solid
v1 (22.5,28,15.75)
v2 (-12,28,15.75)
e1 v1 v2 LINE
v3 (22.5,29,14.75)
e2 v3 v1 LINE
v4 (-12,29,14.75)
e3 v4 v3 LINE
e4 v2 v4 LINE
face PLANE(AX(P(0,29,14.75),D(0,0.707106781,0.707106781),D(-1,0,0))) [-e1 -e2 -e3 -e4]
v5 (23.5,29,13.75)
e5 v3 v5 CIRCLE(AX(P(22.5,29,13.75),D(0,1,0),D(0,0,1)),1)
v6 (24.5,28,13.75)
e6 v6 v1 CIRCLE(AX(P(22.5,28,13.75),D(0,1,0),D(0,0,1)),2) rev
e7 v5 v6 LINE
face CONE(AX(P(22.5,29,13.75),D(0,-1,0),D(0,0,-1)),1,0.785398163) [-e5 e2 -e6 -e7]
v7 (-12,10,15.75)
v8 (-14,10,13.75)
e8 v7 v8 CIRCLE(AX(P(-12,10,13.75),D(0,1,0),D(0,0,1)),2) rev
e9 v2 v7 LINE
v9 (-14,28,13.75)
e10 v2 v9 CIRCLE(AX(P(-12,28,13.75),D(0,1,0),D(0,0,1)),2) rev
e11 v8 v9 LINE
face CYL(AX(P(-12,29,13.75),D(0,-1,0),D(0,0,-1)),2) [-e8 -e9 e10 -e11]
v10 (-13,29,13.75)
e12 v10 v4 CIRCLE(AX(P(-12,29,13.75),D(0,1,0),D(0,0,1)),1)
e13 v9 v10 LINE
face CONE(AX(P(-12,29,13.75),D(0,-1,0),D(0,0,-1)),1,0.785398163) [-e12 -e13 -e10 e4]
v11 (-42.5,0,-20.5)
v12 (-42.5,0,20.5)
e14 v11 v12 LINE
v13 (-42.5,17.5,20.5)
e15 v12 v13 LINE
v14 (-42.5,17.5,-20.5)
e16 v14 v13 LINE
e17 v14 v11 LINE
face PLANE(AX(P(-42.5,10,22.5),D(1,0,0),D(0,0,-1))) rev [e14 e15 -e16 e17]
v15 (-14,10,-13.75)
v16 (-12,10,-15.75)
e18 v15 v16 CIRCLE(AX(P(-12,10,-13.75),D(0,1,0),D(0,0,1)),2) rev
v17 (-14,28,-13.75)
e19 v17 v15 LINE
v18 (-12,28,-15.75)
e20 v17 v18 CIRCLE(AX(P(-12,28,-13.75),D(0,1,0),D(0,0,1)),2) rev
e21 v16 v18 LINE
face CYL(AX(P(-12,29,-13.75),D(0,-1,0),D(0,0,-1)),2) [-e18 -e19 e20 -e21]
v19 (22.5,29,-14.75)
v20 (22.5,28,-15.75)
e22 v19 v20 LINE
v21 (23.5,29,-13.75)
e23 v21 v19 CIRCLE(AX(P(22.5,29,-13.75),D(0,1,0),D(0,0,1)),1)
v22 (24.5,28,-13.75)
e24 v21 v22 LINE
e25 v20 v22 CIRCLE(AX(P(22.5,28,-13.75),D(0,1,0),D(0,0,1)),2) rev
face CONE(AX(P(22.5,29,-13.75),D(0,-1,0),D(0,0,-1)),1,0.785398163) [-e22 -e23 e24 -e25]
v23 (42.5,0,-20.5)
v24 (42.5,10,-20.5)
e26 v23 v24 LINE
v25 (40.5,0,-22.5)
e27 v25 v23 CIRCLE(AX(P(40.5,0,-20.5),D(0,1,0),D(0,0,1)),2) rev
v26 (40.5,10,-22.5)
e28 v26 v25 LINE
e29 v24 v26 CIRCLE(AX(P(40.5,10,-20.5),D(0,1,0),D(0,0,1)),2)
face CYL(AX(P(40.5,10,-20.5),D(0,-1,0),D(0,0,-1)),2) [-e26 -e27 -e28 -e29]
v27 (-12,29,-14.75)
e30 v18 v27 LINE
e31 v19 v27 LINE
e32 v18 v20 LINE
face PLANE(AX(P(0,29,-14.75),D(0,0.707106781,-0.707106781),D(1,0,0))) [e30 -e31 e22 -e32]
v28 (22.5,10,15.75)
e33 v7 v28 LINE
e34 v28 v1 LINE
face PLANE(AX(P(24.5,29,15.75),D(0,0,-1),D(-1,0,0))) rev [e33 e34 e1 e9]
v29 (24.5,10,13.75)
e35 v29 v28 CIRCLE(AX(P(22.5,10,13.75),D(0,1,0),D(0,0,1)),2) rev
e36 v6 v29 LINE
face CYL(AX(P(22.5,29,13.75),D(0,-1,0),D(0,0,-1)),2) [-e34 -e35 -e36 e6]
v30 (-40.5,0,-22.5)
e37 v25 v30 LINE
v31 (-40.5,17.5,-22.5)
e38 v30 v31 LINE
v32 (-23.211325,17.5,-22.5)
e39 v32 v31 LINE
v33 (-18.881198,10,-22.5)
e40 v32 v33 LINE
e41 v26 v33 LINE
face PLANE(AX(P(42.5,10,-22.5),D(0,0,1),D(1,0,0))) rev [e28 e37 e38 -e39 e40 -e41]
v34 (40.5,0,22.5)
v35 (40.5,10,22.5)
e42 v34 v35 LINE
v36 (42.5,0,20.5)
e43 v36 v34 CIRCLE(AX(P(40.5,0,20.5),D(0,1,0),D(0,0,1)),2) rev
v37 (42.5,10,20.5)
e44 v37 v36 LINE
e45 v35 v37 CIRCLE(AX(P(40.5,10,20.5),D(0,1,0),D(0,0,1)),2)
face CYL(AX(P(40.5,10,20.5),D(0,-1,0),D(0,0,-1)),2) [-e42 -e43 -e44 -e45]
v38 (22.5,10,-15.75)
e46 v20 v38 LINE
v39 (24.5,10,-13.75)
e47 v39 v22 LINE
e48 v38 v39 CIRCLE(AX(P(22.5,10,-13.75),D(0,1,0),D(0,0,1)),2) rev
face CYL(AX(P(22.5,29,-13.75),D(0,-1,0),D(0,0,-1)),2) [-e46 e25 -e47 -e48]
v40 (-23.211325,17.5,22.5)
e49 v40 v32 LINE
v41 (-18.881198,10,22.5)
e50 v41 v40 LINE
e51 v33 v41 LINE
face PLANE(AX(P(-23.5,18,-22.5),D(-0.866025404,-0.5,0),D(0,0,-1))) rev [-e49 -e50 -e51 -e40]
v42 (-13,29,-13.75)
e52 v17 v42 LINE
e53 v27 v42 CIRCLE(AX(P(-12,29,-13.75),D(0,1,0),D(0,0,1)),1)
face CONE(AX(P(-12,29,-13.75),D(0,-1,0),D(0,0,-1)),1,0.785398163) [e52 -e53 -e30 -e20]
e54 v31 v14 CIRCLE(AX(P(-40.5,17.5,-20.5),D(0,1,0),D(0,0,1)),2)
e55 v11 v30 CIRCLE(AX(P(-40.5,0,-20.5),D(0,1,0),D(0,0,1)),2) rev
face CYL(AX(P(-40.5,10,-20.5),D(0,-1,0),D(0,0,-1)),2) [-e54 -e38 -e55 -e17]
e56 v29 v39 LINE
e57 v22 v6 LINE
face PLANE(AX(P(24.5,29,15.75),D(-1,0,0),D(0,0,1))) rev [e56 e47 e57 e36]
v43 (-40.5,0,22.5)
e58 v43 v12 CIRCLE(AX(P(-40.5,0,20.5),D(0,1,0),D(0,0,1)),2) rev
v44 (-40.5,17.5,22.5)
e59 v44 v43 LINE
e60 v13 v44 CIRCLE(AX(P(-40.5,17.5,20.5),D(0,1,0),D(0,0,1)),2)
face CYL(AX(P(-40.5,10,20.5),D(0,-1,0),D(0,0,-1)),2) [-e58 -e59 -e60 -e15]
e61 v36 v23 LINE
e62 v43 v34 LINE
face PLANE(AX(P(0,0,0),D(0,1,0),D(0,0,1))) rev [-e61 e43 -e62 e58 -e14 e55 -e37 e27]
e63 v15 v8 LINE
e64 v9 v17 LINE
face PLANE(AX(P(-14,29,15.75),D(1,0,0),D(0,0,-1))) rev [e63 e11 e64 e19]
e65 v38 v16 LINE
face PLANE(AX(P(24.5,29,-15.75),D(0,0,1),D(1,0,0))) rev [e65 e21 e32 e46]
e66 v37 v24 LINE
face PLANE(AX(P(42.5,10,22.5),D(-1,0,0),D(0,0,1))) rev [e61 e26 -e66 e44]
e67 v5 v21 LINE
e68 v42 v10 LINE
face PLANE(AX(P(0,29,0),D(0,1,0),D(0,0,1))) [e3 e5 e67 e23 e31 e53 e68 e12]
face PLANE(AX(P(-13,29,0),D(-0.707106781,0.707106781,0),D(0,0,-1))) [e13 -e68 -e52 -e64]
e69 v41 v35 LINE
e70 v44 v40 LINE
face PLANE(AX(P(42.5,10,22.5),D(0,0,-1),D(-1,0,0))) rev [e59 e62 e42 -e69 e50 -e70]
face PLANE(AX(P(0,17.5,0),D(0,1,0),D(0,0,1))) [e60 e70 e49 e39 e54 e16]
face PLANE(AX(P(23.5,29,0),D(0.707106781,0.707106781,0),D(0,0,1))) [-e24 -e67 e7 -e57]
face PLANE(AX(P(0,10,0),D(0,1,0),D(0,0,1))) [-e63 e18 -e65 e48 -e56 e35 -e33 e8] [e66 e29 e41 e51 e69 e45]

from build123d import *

# Parameters (mm, degrees)
SKETCH_1_W       = 85
SKETCH_1_H       = 45
EXTRUDE_1_DEPTH  = 10
SKETCH_2_W       = 19
SKETCH_2_H       = 45
EXTRUDE_2_DEPTH  = 7.5
CHAMFER_1_SIZE   = 8
CHAMFER_1_SIZE_2 = 4.618802154
SKETCH_3_W       = 38.5
SKETCH_3_H       = 31.5
EXTRUDE_3_DEPTH  = 19
FILLET_1_R       = 2
CHAMFER_2_SIZE   = 1
FILLET_2_R       = 2


with BuildPart() as part:
    # 草图1 → 凸台-拉伸1 (new body)
    with BuildSketch(Plane(origin=(0, 0, 0), x_dir=(1, 0, 0), z_dir=(0, 1, 0))):
        Rectangle(SKETCH_1_W, SKETCH_1_H)
    extrude(amount=EXTRUDE_1_DEPTH)

    # 草图2 → 凸台-拉伸2 (add)
    with BuildSketch(Plane(origin=(0, 10, 0), x_dir=(1, 0, 0), z_dir=(0, 1, 0))):
        with Locations((-33, 0)):
            Rectangle(SKETCH_2_W, SKETCH_2_H)
    extrude(amount=EXTRUDE_2_DEPTH)

    # 倒角1
    # the kernel refuses this chamfer: 8, 4.618802154 mm, written as the material it adds along each edge
    with BuildSketch(Plane(origin=(-23.5, 10, -22.5), x_dir=(-0.01932676561270072, 0.9998132206222079, 0), z_dir=(0, 0, 1))) as chamfer_1_piece_1_section:
        Polygon((CHAMFER_1_SIZE * 0.999813220622, -CHAMFER_1_SIZE * 0.0193267656127), (-CHAMFER_1_SIZE_2 * 0.0193267656107, -CHAMFER_1_SIZE_2 * 0.999813220518), (0, 0), align=None)
    chamfer_1_piece_1 = extrude(amount=45, mode=Mode.PRIVATE)
    chamfer_1_piece_1 = split(chamfer_1_piece_1, bisect_by=Plane(origin=(-21.997429692, 17.5, 0), z_dir=(0, -1, 0)), keep=Keep.TOP, mode=Mode.PRIVATE)
    add(chamfer_1_piece_1)

    # 草图3 → 凸台-拉伸3 (add)
    with BuildSketch(Plane(origin=(0, 10, 0), x_dir=(1, 0, 0), z_dir=(0, 1, 0))):
        with Locations((5.25, 0)):
            Rectangle(SKETCH_3_W, SKETCH_3_H)
    extrude(amount=EXTRUDE_3_DEPTH)

    # 圆角1
    fillet_1_edges = [part.edges().sort_by_distance(p)[0] for p in [
        (-14, 19.5, -15.75),
        (-14, 19.5, 15.75),
        (24.5, 19.5, 15.75),
        (24.5, 19.5, -15.75),
    ]]
    fillet(fillet_1_edges, radius=FILLET_1_R)

    # 倒角2
    chamfer_2_edges = [part.edges().sort_by_distance(p)[0] for p in [
        (-14, 29, 0),
        (5.25, 29, -15.75),
        (5.25, 29, 15.75),
        (24.5, 29, 0),
        (-13.414213562, 29, 15.164213562),
        (23.914213562, 29, 15.164213562),
        (23.914213562, 29, -15.164213562),
        (-13.414213562, 29, -15.164213562),
    ]]
    chamfer(chamfer_2_edges, length=CHAMFER_2_SIZE)

    # 圆角2
    fillet_2_edges = [part.edges().sort_by_distance(p)[0] for p in [
        (-42.5, 8.75, -22.5),
        (42.5, 5, -22.5),
        (42.5, 5, 22.5),
        (-42.5, 8.75, 22.5),
    ]]
    fillet(fillet_2_edges, radius=FILLET_2_R)


solid = part.part
